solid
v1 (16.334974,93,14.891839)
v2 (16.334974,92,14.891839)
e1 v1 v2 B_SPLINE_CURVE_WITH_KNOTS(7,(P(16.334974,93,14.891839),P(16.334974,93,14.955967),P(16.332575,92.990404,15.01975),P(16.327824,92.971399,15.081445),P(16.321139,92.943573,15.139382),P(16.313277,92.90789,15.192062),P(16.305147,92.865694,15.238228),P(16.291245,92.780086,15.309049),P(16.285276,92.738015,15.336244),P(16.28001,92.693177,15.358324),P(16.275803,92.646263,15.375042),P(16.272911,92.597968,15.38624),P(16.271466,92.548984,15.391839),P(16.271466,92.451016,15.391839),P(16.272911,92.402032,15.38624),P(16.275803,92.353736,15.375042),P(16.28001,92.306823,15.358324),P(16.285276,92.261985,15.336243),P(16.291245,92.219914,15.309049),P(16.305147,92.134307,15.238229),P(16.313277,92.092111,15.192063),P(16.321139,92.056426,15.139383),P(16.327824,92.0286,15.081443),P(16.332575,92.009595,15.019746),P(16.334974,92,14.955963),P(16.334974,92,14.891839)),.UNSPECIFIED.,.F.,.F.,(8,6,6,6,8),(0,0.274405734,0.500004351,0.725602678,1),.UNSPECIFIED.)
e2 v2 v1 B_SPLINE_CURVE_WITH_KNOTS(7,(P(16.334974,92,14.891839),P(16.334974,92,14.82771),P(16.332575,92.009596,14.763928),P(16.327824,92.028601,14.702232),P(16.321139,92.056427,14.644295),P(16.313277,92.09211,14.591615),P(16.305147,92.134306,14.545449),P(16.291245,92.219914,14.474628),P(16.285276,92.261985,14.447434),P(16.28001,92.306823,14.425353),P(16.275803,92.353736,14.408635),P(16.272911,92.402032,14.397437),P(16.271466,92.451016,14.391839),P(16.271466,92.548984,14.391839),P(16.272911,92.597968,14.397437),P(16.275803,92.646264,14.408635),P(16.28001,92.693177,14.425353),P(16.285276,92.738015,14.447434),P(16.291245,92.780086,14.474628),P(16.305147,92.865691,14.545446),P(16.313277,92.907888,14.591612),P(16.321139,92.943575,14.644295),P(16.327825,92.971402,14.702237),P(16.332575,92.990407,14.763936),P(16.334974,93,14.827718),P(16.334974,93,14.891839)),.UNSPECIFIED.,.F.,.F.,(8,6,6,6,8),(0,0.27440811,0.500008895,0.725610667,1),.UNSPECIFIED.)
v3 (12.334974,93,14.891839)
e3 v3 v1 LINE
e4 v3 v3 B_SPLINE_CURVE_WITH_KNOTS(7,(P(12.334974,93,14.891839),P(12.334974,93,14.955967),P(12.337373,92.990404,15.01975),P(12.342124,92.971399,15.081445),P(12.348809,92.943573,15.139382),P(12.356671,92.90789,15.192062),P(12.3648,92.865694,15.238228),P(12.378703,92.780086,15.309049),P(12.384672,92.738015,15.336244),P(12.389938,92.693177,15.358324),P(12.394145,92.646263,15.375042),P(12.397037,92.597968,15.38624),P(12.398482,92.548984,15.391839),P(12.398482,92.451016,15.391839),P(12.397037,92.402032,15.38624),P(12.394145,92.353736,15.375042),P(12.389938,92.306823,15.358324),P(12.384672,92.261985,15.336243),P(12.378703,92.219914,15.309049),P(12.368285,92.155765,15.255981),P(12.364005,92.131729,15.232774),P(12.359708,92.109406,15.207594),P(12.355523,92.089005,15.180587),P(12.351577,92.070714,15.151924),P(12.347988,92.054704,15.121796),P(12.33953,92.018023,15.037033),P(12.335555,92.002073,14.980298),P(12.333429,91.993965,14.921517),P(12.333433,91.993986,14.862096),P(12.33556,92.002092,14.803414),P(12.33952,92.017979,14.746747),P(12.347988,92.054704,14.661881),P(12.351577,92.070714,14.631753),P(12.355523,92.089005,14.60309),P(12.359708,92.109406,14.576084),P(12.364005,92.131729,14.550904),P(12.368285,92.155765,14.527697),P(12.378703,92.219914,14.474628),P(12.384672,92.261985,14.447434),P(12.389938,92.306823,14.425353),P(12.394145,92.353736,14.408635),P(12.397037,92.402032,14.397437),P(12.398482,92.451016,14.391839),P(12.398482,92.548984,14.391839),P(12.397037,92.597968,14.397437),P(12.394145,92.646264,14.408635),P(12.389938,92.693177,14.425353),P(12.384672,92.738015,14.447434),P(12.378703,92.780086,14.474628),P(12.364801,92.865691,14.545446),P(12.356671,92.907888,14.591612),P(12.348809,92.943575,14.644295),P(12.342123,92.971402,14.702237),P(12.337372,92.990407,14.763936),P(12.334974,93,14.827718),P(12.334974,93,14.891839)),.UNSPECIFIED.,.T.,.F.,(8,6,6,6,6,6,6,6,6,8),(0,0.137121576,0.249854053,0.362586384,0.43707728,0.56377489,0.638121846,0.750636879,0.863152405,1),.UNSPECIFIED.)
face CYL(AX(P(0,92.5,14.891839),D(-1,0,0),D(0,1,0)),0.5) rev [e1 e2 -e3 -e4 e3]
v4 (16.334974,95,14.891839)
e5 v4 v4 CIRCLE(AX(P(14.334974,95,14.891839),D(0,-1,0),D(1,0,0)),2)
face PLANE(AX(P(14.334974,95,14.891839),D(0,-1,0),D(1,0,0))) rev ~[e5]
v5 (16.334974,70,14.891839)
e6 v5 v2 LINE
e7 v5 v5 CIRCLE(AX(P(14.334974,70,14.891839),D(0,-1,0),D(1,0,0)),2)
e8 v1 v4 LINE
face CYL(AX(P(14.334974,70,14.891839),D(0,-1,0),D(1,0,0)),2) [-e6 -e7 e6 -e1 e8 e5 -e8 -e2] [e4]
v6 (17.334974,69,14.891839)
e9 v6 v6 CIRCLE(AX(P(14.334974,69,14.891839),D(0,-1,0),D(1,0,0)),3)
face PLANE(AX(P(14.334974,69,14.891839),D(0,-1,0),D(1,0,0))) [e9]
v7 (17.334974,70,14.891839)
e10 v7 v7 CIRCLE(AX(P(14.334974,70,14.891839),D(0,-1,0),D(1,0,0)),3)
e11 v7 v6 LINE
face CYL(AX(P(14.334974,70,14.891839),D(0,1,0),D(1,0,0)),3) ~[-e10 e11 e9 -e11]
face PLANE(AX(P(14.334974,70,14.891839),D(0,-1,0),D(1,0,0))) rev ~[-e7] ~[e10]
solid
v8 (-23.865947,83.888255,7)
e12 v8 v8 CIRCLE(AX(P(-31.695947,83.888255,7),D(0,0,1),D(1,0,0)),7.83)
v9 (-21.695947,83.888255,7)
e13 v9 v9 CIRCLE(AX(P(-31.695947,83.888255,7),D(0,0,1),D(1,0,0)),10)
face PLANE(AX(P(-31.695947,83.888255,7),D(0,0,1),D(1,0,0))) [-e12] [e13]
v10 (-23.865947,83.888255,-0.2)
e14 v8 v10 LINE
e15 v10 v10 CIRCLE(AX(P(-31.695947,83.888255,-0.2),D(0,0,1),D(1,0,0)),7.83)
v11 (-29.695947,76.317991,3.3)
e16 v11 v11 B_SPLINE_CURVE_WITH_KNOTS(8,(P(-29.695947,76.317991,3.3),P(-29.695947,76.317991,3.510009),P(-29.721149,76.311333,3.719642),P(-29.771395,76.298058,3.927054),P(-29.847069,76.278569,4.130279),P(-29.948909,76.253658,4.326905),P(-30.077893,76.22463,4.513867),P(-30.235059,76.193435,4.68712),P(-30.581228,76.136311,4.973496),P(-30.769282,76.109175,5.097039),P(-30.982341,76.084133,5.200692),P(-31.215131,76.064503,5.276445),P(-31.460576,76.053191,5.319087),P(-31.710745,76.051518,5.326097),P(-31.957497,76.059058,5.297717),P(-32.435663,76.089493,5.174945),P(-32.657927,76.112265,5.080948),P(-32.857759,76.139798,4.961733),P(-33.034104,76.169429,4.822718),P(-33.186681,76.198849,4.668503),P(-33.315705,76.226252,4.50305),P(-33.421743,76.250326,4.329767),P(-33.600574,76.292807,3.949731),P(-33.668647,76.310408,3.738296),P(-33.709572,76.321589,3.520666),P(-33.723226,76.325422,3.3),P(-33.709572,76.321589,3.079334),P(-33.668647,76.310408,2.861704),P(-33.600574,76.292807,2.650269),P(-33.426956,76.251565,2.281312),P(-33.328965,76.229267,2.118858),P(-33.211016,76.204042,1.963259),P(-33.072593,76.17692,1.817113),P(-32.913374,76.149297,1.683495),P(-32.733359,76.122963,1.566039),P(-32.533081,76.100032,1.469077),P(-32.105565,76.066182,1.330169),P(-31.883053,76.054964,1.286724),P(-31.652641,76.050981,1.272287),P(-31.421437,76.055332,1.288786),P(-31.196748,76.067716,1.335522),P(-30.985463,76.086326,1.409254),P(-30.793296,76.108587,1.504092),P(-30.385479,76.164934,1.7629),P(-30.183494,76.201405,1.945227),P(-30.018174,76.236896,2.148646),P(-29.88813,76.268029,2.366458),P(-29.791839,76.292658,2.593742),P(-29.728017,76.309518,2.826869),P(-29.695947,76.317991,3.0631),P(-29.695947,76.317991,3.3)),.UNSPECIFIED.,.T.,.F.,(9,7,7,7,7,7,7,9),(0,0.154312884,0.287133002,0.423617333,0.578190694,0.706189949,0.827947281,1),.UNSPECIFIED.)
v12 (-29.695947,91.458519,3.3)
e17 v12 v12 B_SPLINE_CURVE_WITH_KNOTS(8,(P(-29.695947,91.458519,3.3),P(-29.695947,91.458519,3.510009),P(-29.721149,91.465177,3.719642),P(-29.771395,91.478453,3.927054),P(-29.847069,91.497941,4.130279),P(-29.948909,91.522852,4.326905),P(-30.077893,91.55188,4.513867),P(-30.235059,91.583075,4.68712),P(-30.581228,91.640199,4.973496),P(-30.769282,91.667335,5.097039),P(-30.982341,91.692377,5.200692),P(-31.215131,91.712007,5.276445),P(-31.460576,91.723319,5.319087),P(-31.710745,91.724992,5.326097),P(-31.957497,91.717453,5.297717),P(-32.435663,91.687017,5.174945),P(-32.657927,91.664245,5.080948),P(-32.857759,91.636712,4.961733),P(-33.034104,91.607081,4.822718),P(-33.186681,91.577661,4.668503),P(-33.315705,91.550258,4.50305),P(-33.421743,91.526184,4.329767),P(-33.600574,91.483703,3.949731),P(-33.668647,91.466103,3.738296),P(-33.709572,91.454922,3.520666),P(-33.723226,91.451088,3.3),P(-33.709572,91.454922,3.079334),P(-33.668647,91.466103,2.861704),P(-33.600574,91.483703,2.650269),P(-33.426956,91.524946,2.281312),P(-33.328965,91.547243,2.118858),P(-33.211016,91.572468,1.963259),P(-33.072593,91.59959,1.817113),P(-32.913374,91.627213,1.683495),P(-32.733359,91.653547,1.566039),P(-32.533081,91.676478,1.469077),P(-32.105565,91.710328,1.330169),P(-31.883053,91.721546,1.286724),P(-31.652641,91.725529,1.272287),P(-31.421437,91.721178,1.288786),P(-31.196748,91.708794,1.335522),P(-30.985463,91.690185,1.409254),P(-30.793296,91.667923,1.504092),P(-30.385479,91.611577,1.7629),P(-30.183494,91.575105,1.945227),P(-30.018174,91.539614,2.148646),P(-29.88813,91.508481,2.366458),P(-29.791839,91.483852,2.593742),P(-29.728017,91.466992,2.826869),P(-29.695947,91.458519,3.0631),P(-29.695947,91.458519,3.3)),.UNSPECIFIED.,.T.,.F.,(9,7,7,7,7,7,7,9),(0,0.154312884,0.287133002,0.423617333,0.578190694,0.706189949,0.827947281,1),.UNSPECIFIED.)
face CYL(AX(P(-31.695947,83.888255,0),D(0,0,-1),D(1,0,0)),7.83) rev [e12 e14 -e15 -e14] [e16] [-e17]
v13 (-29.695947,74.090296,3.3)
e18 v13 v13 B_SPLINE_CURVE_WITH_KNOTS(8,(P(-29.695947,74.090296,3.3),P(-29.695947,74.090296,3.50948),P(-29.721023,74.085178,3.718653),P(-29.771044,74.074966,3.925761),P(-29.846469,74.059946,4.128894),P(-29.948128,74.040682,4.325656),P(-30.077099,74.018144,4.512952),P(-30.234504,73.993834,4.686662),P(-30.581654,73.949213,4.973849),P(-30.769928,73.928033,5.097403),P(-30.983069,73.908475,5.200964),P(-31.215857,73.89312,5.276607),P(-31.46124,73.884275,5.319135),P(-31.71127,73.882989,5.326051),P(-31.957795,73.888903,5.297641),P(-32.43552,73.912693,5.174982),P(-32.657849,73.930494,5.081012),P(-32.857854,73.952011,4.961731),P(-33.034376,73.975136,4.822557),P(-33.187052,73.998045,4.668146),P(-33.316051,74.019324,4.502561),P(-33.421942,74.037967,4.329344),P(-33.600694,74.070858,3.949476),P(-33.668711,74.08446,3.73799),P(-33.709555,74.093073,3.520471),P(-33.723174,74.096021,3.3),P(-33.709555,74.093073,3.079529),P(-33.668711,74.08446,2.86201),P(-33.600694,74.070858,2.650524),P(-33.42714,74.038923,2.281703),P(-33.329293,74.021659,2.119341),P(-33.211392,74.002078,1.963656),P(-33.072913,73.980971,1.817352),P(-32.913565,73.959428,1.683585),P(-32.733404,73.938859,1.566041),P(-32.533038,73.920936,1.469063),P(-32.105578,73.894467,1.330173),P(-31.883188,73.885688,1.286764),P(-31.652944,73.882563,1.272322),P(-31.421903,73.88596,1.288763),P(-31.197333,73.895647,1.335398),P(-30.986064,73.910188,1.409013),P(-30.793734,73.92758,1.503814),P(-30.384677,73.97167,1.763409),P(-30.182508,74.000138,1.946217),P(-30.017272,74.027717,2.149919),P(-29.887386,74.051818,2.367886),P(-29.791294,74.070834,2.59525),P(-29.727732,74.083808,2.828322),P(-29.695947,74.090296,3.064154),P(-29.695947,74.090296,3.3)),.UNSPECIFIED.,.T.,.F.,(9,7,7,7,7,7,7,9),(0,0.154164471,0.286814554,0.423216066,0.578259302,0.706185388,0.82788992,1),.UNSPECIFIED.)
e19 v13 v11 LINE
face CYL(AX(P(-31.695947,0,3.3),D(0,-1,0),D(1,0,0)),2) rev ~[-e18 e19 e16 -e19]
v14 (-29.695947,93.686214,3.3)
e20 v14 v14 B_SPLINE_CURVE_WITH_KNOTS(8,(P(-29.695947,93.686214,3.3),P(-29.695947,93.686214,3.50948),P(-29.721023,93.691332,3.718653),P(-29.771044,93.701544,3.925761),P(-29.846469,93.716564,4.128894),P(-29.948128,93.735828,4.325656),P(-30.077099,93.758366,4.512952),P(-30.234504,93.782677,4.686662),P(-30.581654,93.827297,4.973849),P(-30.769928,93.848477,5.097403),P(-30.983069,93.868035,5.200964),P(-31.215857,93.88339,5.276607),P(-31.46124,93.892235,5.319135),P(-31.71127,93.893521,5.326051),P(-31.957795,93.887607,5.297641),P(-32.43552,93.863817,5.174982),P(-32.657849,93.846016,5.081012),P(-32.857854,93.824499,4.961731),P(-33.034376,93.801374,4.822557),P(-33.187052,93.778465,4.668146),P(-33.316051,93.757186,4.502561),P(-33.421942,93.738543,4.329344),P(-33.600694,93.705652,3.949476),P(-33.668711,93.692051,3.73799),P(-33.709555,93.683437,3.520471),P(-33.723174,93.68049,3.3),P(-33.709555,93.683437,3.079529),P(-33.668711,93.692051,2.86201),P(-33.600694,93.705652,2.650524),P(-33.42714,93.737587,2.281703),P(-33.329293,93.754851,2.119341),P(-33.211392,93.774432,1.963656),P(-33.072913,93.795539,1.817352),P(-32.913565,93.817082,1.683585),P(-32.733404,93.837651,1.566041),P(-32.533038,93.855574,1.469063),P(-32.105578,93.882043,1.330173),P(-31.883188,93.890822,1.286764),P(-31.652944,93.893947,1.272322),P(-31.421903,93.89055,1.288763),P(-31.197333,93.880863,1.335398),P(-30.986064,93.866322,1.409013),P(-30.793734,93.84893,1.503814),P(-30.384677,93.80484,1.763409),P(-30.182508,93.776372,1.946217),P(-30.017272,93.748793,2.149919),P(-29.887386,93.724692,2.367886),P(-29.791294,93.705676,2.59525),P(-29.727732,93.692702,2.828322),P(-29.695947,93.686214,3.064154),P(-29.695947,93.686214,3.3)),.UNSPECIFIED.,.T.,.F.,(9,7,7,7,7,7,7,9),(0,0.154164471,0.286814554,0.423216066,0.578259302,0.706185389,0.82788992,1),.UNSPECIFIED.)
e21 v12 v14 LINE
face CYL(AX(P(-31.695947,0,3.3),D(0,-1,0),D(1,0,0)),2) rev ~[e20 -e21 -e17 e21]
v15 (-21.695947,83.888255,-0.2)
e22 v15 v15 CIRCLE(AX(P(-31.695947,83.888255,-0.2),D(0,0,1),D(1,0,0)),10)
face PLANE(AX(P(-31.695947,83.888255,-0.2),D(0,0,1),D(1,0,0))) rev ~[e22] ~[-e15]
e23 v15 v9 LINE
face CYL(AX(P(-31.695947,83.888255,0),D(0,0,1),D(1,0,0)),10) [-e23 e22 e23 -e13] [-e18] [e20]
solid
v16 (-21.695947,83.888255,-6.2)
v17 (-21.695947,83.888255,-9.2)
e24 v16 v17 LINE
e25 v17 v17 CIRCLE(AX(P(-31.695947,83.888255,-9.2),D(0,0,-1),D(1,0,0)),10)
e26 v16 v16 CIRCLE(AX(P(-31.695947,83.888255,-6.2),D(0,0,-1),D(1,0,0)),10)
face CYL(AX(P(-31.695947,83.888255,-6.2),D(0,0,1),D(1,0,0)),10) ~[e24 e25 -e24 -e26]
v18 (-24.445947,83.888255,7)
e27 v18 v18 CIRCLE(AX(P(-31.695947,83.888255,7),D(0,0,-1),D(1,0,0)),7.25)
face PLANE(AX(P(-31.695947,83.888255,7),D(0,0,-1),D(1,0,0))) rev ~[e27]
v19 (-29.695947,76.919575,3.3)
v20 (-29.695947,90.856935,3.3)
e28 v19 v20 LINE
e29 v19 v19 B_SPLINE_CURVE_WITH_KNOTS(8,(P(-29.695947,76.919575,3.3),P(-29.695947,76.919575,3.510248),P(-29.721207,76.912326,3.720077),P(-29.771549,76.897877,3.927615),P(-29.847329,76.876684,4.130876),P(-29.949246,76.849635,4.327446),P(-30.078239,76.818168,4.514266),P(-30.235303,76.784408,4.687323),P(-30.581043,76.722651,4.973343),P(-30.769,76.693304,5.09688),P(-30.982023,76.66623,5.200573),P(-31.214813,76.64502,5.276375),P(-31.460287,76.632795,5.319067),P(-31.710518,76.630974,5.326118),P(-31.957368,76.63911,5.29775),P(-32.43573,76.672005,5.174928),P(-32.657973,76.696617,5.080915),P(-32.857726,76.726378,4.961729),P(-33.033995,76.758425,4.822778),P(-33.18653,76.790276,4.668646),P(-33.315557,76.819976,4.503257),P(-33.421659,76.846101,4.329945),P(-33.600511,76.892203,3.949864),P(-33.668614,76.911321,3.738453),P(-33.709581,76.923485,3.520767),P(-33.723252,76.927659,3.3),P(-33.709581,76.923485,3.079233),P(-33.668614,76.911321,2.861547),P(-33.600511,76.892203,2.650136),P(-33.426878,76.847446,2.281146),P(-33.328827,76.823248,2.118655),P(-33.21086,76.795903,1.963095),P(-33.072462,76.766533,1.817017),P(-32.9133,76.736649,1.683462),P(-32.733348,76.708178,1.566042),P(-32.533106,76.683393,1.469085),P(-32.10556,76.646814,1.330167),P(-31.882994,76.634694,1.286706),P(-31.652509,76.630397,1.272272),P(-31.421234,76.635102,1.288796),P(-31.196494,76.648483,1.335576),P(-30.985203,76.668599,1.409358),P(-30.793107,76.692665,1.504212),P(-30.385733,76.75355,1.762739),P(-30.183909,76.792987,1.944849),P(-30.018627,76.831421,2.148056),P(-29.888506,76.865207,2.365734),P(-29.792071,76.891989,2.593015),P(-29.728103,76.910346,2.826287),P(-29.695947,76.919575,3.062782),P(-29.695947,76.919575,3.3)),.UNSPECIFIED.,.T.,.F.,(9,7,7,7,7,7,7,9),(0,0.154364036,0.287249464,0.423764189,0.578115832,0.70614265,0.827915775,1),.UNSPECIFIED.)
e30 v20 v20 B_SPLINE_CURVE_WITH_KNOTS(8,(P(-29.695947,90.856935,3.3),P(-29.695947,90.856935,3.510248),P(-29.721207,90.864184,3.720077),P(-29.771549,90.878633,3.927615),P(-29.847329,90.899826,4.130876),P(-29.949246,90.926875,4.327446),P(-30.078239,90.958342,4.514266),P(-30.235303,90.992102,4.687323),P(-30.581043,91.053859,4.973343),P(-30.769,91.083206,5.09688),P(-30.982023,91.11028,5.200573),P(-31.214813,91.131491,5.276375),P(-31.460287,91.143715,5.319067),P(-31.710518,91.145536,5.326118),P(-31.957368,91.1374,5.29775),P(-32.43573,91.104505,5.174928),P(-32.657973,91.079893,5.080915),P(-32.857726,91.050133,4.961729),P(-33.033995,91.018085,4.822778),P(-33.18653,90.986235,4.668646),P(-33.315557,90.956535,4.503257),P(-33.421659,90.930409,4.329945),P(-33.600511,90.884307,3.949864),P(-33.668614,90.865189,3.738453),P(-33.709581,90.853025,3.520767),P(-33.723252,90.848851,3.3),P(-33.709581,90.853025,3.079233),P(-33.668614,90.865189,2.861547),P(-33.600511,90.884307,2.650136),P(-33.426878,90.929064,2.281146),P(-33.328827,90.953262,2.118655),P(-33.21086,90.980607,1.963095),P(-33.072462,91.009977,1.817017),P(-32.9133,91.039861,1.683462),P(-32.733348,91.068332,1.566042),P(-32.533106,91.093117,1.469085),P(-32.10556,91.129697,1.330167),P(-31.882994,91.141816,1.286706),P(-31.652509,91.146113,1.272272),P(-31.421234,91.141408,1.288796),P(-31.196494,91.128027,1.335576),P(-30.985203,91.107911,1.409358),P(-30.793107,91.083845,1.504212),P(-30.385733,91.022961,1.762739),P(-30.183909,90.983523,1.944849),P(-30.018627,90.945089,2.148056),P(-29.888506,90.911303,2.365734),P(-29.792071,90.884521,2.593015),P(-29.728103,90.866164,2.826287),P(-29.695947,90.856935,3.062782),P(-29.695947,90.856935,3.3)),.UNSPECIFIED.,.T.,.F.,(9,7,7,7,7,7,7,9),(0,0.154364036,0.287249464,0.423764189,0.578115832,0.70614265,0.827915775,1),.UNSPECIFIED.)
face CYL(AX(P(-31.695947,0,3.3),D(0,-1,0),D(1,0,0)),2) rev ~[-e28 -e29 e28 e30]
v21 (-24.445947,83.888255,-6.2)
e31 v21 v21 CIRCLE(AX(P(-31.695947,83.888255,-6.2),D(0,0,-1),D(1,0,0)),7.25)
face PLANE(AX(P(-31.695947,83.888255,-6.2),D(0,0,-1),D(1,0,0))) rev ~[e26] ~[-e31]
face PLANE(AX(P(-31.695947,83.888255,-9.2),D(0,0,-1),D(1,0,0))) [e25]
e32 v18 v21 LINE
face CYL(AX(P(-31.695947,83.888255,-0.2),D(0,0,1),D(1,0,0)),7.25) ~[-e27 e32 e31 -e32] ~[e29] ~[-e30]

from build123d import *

# Parameters (mm, degrees)
F0_R          = 10
F0_R_2        = 7.83
F1_DEPTH      = 7
F1_DEPTH_BACK = 0.2
F3_R          = 7.25
F4_DEPTH      = 7.2
F4_DEPTH_BACK = 6
F5_START      = 6
F3_R_2        = 10
F3_R_3        = 7.83
F5_DEPTH      = 3
F2_R          = 2
F10_DEPTH     = 93.8892550597
F7_R          = 2
F11_DEPTH     = 25
F7_R_2        = 3
F12_DEPTH     = 1
F13_R         = 0.5
F14_DEPTH     = 25


# Not quite as in the source:
# - a feature of the source that left no trace in its solid (it failed there, or was rolled back) is left out


with BuildPart() as f1:
    # F0 (on Top) → F1 (new body, two sides)
    with BuildSketch(Plane.XY) as f1_sk:
        with Locations((-31.695947051, 83.8882550597)):
            Circle(F0_R)
        with Locations((-31.695947051, 83.8882550597)):
            Circle(F0_R_2, mode=Mode.SUBTRACT)
    extrude(amount=F1_DEPTH)
    extrude(f1_sk.sketch, amount=-F1_DEPTH_BACK)


with BuildPart() as f4:
    # F3 (on face) → F4 (new body, two sides)
    with BuildSketch(Plane(origin=(0, 0, -0.2), x_dir=(1, 0, 0), z_dir=(0, 0, -1))) as f4_sk:
        with Locations((-31.695947051, -83.8882550597)):
            Circle(F3_R)
    extrude(amount=-F4_DEPTH)
    extrude(f4_sk.sketch, amount=F4_DEPTH_BACK)

    # F3 (on face) → F5 (join)
    with BuildSketch(Plane(origin=(0, 0, -0.2), x_dir=(1, 0, 0), z_dir=(0, 0, -1)).offset(F5_START)):
        with Locations((-31.695947051, -83.8882550597)):
            Circle(F3_R_2)
        with Locations((-31.695947051, -83.8882550597)):
            Circle(F3_R_3, mode=Mode.SUBTRACT)
        with Locations((-31.695947051, -83.8882550597)):
            Circle(F3_R_3)
        with Locations((-31.695947051, -83.8882550597)):
            Circle(F3_R, mode=Mode.SUBTRACT)
        with Locations((-31.695947051, -83.8882550597)):
            Circle(F3_R)
    extrude(amount=F5_DEPTH)


with BuildPart() as f10_tool:
    # F2 (on Front) → F10 (new body, through all)
    with BuildSketch(Plane.XZ):
        with Locations((-31.695947051, 3.3)):
            Circle(F2_R)
    extrude(amount=-F10_DEPTH)


with BuildPart() as f1_1:
    add(f1.part)

    # F10: cut by f10_tool
    add(f10_tool.part, mode=Mode.SUBTRACT)


with BuildPart() as f4_1:
    add(f4.part)

    # F10: cut by f10_tool
    add(f10_tool.part, mode=Mode.SUBTRACT)


with BuildPart() as f11:
    # F7 (on offset) → F11 (new body)
    with BuildSketch(Plane.XZ.offset(-70)):
        with Locations((14.3349738792, 14.8918386549)):
            Circle(F7_R)
    extrude(amount=-F11_DEPTH)

    # F7 (on offset) → F12 (join)
    with BuildSketch(Plane.XZ.offset(-70)):
        with Locations((14.3349738792, 14.8918386549)):
            Circle(F7_R_2)
        with Locations((14.3349738792, 14.8918386549)):
            Circle(F7_R, mode=Mode.SUBTRACT)
        with Locations((14.3349738792, 14.8918386549)):
            Circle(F7_R)
    extrude(amount=F12_DEPTH)

    # F13 (on Right) → F14 (cut)
    with BuildSketch(Plane.YZ):
        with Locations((92.5, 14.8918386549)):
            Circle(F13_R)
    extrude(amount=F14_DEPTH, mode=Mode.SUBTRACT)


solid = Compound([f1_1.part, f4_1.part, f11.part])
